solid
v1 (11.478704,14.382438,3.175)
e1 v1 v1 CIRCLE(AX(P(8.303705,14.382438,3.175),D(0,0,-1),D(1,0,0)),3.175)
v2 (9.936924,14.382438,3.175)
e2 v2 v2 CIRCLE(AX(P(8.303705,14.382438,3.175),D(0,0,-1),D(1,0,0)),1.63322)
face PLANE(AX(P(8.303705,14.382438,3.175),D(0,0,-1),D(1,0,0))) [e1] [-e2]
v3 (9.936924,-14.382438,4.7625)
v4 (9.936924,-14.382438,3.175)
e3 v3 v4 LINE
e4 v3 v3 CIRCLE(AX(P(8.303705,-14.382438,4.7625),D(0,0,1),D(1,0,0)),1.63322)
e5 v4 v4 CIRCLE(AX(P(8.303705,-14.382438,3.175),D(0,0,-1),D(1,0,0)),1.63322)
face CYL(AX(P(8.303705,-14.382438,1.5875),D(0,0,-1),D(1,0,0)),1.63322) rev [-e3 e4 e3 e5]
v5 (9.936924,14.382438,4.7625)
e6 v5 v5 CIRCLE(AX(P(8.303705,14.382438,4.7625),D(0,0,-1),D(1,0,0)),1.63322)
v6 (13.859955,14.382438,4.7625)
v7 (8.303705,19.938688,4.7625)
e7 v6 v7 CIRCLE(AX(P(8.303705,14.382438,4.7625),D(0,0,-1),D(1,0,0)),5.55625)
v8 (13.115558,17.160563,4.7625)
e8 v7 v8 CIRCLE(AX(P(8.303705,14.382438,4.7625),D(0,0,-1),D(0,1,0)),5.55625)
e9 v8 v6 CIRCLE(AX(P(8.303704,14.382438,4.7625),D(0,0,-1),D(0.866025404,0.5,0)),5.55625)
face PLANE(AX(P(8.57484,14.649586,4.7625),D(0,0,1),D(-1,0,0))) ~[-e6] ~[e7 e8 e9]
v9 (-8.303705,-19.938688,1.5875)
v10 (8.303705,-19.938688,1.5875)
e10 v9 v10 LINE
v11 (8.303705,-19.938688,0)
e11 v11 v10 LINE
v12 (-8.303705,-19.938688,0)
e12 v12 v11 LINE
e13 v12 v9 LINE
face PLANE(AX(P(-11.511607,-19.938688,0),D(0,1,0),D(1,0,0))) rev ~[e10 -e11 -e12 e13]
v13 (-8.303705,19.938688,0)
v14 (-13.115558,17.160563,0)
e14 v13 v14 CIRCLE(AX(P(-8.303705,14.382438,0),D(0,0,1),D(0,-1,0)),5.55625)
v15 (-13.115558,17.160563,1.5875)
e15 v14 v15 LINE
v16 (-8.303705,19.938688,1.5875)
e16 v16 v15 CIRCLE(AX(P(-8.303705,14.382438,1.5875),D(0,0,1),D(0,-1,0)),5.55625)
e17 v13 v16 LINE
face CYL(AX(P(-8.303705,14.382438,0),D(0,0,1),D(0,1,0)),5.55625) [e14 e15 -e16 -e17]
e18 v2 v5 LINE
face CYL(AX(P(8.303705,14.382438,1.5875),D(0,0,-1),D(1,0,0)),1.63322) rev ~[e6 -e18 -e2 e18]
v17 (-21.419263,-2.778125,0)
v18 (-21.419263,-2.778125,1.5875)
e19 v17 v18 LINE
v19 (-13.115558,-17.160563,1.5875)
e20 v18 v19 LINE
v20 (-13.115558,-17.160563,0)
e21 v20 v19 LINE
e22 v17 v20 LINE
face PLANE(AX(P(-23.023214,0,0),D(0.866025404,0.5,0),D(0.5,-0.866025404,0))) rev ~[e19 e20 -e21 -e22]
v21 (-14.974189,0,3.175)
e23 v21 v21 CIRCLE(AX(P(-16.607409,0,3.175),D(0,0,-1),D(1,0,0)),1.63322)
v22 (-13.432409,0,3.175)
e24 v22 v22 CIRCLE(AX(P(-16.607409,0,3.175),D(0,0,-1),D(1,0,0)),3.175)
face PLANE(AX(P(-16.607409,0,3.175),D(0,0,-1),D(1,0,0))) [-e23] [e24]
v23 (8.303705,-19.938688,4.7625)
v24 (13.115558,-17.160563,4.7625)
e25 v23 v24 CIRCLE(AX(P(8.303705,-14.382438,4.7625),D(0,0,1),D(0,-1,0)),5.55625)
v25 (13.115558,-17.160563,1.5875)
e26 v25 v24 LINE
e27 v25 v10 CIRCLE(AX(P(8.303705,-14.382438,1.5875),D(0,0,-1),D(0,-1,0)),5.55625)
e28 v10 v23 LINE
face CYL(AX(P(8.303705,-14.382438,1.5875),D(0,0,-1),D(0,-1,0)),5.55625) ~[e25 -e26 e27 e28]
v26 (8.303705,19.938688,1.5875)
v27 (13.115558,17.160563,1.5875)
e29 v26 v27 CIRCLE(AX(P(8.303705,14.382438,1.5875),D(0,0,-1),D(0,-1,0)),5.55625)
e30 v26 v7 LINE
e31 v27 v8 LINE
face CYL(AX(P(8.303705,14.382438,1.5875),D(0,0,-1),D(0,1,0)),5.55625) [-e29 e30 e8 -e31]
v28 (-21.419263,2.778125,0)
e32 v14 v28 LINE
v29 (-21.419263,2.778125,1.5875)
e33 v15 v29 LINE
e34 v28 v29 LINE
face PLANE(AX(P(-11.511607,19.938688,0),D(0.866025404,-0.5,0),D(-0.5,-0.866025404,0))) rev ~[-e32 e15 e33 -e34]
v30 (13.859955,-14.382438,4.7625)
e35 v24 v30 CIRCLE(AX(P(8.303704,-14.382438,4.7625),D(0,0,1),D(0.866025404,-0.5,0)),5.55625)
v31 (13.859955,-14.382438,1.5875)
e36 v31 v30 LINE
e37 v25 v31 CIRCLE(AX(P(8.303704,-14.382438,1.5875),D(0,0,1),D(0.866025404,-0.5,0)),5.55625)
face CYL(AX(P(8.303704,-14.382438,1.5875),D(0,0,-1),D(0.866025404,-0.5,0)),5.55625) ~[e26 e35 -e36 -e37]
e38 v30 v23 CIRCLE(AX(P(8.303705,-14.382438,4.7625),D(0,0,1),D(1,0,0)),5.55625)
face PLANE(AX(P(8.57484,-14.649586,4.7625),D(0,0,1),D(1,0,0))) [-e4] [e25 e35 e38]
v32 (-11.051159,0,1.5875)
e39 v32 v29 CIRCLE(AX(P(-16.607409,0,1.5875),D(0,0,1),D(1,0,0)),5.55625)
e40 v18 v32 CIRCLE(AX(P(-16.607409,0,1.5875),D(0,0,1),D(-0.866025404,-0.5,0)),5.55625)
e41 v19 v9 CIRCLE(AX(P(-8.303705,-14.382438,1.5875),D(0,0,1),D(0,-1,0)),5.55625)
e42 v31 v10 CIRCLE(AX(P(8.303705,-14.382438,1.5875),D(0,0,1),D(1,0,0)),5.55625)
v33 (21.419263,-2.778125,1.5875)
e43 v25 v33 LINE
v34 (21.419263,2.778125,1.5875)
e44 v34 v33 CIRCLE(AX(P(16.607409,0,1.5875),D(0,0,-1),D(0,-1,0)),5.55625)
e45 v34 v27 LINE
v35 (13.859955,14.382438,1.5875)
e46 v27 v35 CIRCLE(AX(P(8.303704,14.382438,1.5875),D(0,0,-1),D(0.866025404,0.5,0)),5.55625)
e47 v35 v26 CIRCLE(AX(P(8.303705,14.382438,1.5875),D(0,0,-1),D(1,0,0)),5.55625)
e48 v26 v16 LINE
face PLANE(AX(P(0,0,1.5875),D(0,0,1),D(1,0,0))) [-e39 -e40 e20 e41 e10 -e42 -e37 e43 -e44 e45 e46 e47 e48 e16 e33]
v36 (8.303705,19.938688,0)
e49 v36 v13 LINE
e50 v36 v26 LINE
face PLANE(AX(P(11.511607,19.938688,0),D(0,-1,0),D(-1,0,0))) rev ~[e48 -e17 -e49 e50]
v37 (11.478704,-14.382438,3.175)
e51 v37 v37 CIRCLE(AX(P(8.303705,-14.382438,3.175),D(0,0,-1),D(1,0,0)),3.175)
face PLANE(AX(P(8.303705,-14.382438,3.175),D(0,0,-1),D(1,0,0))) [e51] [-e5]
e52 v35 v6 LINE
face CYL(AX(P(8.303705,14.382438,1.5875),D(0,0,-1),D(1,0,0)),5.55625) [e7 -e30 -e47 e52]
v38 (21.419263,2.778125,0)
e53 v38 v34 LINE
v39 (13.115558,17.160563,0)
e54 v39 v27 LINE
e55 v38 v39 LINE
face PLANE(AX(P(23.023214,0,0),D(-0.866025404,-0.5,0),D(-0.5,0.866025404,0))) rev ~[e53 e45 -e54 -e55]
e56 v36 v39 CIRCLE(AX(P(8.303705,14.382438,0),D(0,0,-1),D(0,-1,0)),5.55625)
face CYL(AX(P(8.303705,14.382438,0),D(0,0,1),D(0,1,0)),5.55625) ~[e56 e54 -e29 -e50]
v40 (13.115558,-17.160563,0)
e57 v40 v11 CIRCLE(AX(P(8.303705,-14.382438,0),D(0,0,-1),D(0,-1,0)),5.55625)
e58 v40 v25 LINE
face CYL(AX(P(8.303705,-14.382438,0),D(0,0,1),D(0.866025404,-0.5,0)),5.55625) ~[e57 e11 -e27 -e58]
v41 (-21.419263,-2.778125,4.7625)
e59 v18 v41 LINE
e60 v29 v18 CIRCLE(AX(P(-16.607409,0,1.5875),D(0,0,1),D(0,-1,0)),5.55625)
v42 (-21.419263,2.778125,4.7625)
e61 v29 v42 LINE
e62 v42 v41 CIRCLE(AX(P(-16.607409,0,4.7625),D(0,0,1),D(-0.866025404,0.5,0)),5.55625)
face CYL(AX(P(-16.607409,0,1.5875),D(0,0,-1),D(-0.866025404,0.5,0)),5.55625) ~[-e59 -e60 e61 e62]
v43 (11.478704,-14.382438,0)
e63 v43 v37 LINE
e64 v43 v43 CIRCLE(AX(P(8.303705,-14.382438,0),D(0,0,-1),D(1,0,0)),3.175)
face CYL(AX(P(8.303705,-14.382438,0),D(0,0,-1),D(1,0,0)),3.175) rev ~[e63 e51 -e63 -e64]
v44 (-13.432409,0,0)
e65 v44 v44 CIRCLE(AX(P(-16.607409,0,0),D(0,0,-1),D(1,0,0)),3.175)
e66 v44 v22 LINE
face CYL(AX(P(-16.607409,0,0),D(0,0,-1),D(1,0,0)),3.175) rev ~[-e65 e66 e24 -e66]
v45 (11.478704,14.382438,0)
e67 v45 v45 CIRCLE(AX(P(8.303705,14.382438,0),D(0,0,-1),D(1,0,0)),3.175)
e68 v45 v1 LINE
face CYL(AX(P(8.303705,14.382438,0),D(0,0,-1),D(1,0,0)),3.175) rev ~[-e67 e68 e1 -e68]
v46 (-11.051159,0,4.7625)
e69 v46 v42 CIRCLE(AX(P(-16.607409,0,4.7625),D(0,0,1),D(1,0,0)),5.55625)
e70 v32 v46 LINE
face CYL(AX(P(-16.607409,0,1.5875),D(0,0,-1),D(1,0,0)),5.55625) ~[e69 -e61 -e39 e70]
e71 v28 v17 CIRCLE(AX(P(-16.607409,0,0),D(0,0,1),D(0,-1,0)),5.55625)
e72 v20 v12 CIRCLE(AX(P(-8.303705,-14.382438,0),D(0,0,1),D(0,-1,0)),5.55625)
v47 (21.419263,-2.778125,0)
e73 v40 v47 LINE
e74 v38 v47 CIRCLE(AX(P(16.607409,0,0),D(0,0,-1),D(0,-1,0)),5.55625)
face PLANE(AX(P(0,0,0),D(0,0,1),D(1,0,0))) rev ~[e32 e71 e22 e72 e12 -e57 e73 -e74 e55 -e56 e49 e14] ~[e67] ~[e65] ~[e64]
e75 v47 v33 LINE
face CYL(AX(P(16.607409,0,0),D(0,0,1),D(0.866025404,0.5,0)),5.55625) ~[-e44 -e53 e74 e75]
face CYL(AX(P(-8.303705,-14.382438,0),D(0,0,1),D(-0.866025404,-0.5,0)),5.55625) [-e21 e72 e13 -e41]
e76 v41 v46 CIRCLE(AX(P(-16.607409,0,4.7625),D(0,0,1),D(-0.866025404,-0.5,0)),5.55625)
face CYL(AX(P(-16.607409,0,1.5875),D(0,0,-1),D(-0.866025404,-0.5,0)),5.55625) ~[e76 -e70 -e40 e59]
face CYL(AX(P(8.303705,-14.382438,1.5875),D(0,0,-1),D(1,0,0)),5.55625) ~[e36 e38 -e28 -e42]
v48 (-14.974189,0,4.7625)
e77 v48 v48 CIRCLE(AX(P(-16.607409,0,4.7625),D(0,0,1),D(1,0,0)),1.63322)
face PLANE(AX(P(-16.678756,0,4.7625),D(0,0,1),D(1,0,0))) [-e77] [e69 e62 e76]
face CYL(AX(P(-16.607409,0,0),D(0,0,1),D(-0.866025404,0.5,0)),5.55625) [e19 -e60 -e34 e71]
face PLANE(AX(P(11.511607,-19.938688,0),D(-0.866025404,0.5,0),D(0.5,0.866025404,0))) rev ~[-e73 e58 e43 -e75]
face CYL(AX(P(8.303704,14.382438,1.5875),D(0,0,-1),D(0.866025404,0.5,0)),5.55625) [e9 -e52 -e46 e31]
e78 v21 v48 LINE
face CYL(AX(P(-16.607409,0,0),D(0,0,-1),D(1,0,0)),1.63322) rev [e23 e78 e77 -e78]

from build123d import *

# Parameters (mm, degrees)
F0_R     = 1.63322
F1_DEPTH = 1.5875
F2_R     = 5.55625
F3_R     = 1.63322
F4_DEPTH = 3.175
F6_R     = 3.175
F7_DEPTH = 3.175


# Not quite as in the source:
# - after a boolean that leaves OpenCascade's solid faulty, fix() repairs it
# - a pattern or mirror of a feature is missing from the dataset's text; its kind, count and spacing are read off the source's solid


with BuildPart() as f1:
    # F0 (on Top) → F1 (new body)
    with BuildSketch(Plane.XY):
        Polygon((11.5116069332, 19.938688085), (-11.5116069332, 19.938688085), (-23.0232138664, 0), (-11.5116069332, -19.938688085), (11.5116069332, -19.938688085), (23.0232138664, 0), align=None)
        with Locations((8.3037045, -14.382438085)):
            Circle(F0_R, mode=Mode.SUBTRACT)
        with Locations((-16.607409, 0)):
            Circle(F0_R, mode=Mode.SUBTRACT)
        with Locations((8.3037045, 14.382438085)):
            Circle(F0_R, mode=Mode.SUBTRACT)
    extrude(amount=F1_DEPTH)

    # F2
    f2_edges = [f1.edges().sort_by_distance(p)[0] for p in [
        (-23.023214, 0, 0.79375),
        (-11.511607, -19.938688, 0.79375),
        (11.511607, -19.938688, 0.79375),
        (23.023214, 0, 0.79375),
        (11.511607, 19.938688, 0.79375),
        (-11.511607, 19.938688, 0.79375),
    ]]
    fillet(f2_edges, radius=F2_R)

    # F3 (on face) → F4 (join)
    with BuildSketch(Plane.XY.offset(1.5875)):
        with BuildLine():
            ThreePointArc((13.1155581498, -17.160563085), (13.6706298723, -15.8205014044), (13.8599545, -14.382438085))
            ThreePointArc((13.8599545, -14.382438085), (4.374842447, -10.4535760321), (8.3037045, -19.938688085))
            ThreePointArc((8.3037045, -19.938688085), (11.0818295, -19.1942917348), (13.1155581498, -17.160563085))
        make_face()
        with Locations((8.3037045, -14.382438085)):
            Circle(F3_R, mode=Mode.SUBTRACT)
        with BuildLine():
            ThreePointArc((-21.4192626498, 2.778125), (-22.163659, 0), (-21.4192626498, -2.778125))
            ThreePointArc((-21.4192626498, -2.778125), (-15.1693456806, -5.3669253723), (-11.051159, 0))
            ThreePointArc((-11.051159, 0), (-15.1693456806, 5.3669253723), (-21.4192626498, 2.778125))
        make_face()
        with Locations((-16.607409, 0)):
            Circle(F3_R, mode=Mode.SUBTRACT)
    f4 = extrude(amount=F4_DEPTH)

    # F4_copies: F4 across plane
    add(f4.mirror(Plane.ZX))

    add(f1.part.fix(), mode=Mode.REPLACE)

    # F6 (on face) → F7 (cut, through all)
    with BuildSketch(Plane(origin=(0, 0, 0), x_dir=(1, 0, 0), z_dir=(0, 0, -1))):
        with Locations((8.3037045, 14.382438085)):
            Circle(F6_R)
        with Locations((8.3037045, -14.382438085)):
            Circle(F6_R)
        with Locations((-16.607409, 0)):
            Circle(F6_R)
    extrude(amount=-F7_DEPTH, mode=Mode.SUBTRACT)


solid = f1.part
